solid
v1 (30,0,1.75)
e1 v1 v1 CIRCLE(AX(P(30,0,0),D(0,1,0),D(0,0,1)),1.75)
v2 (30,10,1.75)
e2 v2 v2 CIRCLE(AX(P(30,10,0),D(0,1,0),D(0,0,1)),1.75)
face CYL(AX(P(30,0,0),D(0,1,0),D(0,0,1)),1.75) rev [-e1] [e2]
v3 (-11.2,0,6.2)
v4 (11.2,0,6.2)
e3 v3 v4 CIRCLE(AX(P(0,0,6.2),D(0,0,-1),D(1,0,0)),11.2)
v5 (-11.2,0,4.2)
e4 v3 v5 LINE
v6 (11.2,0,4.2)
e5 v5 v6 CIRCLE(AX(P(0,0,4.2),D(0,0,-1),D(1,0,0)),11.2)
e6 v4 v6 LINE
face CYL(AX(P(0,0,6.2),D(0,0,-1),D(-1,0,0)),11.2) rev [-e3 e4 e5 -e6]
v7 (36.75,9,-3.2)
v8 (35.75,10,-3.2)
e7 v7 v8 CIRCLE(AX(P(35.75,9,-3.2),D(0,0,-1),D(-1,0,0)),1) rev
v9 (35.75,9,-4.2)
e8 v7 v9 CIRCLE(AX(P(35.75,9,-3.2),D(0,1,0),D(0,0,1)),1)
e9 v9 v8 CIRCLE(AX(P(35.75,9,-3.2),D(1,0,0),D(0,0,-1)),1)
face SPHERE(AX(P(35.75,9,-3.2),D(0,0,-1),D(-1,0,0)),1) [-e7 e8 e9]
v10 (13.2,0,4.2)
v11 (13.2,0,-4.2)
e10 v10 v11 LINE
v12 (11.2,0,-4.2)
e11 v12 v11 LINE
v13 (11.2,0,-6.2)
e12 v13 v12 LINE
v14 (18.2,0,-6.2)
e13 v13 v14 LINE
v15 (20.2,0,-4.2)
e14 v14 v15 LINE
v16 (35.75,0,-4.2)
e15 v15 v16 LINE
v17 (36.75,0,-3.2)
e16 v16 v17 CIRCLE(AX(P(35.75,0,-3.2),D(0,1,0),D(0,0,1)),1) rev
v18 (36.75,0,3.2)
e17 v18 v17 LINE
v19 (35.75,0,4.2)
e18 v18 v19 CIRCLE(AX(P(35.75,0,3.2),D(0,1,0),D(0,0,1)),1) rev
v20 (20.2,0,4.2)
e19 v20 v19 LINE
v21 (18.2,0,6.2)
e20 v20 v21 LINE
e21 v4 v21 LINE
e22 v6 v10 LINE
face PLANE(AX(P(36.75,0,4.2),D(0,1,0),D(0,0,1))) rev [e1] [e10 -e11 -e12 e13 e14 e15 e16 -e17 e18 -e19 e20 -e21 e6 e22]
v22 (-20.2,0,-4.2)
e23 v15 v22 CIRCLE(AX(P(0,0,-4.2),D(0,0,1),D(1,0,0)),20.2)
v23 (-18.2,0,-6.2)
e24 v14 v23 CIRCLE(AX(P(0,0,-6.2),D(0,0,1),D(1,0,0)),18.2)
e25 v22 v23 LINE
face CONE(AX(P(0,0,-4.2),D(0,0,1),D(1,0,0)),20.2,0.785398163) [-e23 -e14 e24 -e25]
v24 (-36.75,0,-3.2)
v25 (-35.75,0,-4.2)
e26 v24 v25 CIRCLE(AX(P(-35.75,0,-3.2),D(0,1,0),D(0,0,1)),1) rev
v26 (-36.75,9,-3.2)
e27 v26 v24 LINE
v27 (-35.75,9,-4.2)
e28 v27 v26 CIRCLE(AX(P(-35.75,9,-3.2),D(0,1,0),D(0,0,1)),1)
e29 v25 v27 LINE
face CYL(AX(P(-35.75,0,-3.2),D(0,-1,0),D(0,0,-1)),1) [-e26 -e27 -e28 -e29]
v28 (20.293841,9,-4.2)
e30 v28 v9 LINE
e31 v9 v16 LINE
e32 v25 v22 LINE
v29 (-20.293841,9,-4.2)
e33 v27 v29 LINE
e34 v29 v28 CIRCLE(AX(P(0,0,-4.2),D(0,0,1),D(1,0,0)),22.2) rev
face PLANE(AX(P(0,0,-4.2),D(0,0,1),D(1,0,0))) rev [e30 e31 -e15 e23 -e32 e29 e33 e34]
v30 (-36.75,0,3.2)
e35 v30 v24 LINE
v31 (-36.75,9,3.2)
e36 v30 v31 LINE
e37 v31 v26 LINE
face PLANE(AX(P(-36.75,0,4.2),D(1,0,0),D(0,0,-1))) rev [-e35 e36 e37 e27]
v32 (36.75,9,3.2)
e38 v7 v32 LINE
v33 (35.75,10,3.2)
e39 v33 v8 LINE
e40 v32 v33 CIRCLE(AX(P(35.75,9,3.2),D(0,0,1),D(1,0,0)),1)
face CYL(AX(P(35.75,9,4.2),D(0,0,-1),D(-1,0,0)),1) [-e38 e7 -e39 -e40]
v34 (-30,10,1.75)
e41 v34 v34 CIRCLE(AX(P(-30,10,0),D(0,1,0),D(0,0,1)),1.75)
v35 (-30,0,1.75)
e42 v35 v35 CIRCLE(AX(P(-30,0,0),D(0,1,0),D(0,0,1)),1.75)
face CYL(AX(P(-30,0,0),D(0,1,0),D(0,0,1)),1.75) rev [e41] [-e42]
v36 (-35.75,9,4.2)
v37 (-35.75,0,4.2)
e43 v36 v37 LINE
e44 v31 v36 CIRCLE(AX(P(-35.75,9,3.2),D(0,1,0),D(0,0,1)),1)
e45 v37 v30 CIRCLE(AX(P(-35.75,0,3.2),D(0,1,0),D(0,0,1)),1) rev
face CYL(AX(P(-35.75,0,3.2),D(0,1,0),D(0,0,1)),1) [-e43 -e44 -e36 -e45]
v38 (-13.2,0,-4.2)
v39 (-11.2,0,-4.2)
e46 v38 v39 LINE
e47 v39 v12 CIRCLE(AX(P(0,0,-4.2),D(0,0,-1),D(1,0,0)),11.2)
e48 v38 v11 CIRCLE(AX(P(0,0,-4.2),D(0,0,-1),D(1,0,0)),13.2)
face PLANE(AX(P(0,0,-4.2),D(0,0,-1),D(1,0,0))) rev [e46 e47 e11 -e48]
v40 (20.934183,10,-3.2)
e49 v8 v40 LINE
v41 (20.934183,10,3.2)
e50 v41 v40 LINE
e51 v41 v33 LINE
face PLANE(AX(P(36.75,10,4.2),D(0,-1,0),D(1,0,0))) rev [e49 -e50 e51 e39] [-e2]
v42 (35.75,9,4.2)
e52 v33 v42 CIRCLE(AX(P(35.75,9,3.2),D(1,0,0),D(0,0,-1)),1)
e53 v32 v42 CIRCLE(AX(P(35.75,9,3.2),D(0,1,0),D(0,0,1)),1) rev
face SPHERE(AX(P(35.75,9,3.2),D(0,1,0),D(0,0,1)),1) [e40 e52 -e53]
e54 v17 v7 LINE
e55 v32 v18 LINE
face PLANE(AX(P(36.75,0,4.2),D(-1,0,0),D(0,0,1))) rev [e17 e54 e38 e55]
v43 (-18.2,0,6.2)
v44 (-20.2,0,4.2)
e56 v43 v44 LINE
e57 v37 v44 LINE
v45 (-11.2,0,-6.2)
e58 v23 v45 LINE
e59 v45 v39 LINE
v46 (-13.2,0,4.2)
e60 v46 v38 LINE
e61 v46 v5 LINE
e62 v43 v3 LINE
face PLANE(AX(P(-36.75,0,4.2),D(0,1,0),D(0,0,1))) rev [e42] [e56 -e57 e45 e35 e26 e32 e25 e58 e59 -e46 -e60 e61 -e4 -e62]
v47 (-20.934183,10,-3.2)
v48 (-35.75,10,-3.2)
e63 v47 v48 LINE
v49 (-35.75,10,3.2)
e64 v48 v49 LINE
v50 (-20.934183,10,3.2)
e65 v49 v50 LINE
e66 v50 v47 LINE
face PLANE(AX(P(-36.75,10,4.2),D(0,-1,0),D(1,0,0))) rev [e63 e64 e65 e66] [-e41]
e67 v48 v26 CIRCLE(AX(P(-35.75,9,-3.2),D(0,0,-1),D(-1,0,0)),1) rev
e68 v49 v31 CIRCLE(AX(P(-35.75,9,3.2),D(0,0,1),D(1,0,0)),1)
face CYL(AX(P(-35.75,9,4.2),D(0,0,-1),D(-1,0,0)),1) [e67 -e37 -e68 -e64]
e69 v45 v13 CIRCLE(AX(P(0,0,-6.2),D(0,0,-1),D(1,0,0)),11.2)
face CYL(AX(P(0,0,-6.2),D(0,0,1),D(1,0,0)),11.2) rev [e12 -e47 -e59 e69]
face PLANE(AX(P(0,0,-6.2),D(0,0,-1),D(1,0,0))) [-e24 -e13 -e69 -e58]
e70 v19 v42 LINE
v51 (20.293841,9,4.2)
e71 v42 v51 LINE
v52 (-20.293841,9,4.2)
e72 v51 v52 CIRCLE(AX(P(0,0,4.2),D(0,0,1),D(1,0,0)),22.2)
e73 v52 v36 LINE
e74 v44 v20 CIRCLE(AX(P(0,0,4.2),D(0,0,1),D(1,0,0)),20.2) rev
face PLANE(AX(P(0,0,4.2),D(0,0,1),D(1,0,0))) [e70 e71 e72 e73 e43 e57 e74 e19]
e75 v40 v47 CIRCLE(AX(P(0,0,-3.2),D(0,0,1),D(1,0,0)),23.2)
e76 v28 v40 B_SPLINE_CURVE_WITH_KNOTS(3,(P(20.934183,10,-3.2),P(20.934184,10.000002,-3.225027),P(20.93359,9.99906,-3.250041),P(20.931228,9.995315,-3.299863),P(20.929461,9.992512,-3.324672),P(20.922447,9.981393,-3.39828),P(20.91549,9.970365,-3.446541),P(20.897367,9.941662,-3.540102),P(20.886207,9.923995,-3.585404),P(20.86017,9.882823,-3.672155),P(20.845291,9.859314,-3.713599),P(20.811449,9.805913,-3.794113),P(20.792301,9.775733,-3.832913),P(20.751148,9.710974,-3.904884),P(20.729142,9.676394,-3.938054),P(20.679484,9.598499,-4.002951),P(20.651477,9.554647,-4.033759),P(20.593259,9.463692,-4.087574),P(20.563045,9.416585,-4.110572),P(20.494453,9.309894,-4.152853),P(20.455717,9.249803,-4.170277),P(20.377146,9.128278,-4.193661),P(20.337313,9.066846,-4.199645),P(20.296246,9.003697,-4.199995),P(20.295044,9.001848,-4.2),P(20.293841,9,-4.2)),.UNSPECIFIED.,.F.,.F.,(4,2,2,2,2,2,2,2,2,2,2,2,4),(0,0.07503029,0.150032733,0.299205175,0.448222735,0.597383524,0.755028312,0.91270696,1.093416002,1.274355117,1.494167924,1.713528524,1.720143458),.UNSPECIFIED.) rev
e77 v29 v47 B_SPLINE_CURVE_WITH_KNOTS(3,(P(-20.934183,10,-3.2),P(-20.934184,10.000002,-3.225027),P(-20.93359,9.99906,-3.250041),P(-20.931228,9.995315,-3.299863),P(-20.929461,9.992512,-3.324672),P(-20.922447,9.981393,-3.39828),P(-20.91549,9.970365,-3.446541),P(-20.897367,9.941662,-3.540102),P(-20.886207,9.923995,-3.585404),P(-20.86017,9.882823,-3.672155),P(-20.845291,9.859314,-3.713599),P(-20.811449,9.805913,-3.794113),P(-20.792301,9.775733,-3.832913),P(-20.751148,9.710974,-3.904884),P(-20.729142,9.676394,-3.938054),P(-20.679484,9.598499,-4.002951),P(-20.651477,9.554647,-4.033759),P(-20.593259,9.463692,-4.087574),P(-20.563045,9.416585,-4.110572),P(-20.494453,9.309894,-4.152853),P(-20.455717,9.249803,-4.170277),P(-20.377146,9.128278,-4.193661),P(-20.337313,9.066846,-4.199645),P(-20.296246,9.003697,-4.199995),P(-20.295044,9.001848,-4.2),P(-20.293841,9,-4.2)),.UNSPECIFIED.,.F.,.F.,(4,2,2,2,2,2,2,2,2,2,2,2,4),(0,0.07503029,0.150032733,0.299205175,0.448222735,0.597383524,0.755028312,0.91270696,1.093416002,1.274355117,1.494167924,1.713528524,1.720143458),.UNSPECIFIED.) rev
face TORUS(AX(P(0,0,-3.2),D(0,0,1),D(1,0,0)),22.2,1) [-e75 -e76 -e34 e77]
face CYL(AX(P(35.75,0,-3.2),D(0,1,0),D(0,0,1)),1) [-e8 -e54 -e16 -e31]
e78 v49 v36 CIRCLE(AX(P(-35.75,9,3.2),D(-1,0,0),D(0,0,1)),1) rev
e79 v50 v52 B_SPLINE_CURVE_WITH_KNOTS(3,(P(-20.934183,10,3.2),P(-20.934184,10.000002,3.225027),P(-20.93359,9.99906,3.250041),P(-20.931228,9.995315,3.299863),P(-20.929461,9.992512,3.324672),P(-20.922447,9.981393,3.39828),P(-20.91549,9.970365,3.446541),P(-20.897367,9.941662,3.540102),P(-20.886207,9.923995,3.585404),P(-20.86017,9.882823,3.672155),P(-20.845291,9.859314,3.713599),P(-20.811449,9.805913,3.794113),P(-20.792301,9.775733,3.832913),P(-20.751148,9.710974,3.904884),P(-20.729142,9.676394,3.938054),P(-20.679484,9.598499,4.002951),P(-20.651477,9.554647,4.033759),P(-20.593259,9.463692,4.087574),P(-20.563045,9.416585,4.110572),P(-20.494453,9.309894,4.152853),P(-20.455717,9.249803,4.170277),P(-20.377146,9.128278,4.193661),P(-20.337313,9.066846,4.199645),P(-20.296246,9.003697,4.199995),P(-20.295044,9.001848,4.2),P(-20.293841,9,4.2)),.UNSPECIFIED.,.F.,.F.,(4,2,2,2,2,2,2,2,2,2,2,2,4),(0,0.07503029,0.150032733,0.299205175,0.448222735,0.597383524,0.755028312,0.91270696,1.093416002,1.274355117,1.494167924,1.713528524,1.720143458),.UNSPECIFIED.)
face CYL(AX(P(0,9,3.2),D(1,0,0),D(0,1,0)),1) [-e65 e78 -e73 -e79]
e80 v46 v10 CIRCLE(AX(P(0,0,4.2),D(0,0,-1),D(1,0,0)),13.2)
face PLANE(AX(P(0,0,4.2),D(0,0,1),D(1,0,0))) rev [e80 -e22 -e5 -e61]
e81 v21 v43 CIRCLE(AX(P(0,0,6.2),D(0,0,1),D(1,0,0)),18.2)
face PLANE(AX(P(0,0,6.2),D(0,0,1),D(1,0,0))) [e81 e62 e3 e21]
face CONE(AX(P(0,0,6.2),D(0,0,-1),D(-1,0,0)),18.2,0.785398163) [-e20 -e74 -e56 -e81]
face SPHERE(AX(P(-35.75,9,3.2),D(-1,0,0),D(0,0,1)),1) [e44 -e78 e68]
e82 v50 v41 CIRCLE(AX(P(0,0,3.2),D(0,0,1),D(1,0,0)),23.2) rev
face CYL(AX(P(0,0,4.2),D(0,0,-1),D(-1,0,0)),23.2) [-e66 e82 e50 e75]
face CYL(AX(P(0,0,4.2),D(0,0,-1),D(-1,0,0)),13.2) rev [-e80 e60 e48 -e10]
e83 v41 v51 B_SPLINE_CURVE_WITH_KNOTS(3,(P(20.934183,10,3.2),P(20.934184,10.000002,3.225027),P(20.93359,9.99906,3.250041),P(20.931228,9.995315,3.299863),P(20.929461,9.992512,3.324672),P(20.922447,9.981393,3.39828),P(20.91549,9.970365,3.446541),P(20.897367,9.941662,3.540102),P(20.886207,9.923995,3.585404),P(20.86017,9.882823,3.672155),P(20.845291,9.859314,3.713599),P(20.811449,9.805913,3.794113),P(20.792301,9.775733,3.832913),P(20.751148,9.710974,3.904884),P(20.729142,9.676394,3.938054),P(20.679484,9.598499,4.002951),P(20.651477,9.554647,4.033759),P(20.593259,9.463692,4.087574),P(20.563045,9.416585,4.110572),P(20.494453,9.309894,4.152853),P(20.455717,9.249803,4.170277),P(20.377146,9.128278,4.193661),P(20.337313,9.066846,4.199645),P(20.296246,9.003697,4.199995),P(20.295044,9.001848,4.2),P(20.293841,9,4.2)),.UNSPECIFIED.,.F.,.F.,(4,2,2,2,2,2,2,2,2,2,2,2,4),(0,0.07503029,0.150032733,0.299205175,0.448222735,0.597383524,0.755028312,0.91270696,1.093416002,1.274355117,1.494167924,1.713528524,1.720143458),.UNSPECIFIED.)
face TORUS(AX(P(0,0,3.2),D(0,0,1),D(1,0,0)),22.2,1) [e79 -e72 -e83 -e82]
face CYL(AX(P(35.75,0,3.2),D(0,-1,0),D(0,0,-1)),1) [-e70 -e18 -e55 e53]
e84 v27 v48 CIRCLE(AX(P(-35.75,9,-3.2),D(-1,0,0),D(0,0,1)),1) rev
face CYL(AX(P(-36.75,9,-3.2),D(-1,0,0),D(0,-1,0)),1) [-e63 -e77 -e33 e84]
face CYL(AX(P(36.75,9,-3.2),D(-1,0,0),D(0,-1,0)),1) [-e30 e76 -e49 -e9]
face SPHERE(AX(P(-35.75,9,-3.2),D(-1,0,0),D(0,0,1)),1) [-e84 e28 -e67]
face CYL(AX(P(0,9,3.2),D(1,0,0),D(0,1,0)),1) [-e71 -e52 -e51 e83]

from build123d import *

# Parameters (mm, degrees)
BOSS_EXTRUDE1_DEPTH = 4.2
BOSS_EXTRUDE2_DEPTH = 2
CHAMFER1_SIZE       = 2
SKETCH3_R           = 1.75
CUT_EXTRUDE1_DEPTH  = 40.537861601
FILLET1_R           = 1


with BuildPart() as part:
    # Sketch1 → Boss-Extrude1 (new, symmetric)
    with BuildSketch(Plane.XY):
        with BuildLine():
            Line((36.75, 0), (13.2, 0))
            ThreePointArc((13.2, 0), (0, 13.2), (-13.2, 0))
            Line((-13.2, 0), (-36.75, 0))
            Line((-36.75, 0), (-36.75, 10))
            Line((-36.75, 10), (-20.934182573, 10))
            ThreePointArc((-20.934182573, 10), (0, 23.2), (20.934182573, 10))
            Line((20.934182573, 10), (36.75, 10))
            Line((36.75, 10), (36.75, 0))
        make_face()
    extrude(amount=BOSS_EXTRUDE1_DEPTH, both=True)

    # Sketch2 → Boss-Extrude2 (add)
    with BuildSketch(Plane.XY.offset(4.2)):
        with BuildLine():
            Line((-18.2, 0), (-11.2, 0))
            ThreePointArc((-11.2, 0), (0, 11.2), (11.2, 0))
            Line((11.2, 0), (18.2, 0))
            ThreePointArc((18.2, 0), (0, 18.2), (-18.2, 0))
        make_face()
    boss_extrude2 = extrude(amount=BOSS_EXTRUDE2_DEPTH)

    # Mirror1: Boss-Extrude2 across plane
    add(boss_extrude2.mirror(Plane.XY))

    # Chamfer1
    chamfer1_edges = [part.edges().sort_by_distance(p)[0] for p in [
        (0, 18.2, -4.2),
        (0, 18.2, 4.2),
    ]]
    chamfer(chamfer1_edges, length=CHAMFER1_SIZE - 0.0001)  # a hair under: the kernel refuses the full size

    # Sketch3 → Cut-Extrude1 (cut, through all)
    with BuildSketch(Plane(origin=(0, 10, 0), x_dir=(1, 0, 0), z_dir=(0, 1, 0))):
        with Locations(Location((-30, 0, 0), (0, 0, 270))):
            Circle(SKETCH3_R)
        with Locations(Location((30, 0, 0), (0, 0, 270))):
            Circle(SKETCH3_R)
    extrude(amount=-CUT_EXTRUDE1_DEPTH, mode=Mode.SUBTRACT)

    # Fillet1
    fillet1_edges = [part.edges().sort_by_distance(p)[0] for p in [
        (36.75, 5, -4.2),
        (-36.75, 10, 0),
        (36.75, 10, 0),
        (36.75, 5, 4.2),
        (28.842091287, 10, 4.2),
        (0, 23.2, 4.2),
        (-28.842091287, 10, 4.2),
        (-36.75, 5, 4.2),
        (-36.75, 5, -4.2),
        (-28.842091287, 10, -4.2),
        (0, 23.2, -4.2),
        (28.842091287, 10, -4.2),
    ]]
    fillet(fillet1_edges, radius=FILLET1_R)


solid = part.part
